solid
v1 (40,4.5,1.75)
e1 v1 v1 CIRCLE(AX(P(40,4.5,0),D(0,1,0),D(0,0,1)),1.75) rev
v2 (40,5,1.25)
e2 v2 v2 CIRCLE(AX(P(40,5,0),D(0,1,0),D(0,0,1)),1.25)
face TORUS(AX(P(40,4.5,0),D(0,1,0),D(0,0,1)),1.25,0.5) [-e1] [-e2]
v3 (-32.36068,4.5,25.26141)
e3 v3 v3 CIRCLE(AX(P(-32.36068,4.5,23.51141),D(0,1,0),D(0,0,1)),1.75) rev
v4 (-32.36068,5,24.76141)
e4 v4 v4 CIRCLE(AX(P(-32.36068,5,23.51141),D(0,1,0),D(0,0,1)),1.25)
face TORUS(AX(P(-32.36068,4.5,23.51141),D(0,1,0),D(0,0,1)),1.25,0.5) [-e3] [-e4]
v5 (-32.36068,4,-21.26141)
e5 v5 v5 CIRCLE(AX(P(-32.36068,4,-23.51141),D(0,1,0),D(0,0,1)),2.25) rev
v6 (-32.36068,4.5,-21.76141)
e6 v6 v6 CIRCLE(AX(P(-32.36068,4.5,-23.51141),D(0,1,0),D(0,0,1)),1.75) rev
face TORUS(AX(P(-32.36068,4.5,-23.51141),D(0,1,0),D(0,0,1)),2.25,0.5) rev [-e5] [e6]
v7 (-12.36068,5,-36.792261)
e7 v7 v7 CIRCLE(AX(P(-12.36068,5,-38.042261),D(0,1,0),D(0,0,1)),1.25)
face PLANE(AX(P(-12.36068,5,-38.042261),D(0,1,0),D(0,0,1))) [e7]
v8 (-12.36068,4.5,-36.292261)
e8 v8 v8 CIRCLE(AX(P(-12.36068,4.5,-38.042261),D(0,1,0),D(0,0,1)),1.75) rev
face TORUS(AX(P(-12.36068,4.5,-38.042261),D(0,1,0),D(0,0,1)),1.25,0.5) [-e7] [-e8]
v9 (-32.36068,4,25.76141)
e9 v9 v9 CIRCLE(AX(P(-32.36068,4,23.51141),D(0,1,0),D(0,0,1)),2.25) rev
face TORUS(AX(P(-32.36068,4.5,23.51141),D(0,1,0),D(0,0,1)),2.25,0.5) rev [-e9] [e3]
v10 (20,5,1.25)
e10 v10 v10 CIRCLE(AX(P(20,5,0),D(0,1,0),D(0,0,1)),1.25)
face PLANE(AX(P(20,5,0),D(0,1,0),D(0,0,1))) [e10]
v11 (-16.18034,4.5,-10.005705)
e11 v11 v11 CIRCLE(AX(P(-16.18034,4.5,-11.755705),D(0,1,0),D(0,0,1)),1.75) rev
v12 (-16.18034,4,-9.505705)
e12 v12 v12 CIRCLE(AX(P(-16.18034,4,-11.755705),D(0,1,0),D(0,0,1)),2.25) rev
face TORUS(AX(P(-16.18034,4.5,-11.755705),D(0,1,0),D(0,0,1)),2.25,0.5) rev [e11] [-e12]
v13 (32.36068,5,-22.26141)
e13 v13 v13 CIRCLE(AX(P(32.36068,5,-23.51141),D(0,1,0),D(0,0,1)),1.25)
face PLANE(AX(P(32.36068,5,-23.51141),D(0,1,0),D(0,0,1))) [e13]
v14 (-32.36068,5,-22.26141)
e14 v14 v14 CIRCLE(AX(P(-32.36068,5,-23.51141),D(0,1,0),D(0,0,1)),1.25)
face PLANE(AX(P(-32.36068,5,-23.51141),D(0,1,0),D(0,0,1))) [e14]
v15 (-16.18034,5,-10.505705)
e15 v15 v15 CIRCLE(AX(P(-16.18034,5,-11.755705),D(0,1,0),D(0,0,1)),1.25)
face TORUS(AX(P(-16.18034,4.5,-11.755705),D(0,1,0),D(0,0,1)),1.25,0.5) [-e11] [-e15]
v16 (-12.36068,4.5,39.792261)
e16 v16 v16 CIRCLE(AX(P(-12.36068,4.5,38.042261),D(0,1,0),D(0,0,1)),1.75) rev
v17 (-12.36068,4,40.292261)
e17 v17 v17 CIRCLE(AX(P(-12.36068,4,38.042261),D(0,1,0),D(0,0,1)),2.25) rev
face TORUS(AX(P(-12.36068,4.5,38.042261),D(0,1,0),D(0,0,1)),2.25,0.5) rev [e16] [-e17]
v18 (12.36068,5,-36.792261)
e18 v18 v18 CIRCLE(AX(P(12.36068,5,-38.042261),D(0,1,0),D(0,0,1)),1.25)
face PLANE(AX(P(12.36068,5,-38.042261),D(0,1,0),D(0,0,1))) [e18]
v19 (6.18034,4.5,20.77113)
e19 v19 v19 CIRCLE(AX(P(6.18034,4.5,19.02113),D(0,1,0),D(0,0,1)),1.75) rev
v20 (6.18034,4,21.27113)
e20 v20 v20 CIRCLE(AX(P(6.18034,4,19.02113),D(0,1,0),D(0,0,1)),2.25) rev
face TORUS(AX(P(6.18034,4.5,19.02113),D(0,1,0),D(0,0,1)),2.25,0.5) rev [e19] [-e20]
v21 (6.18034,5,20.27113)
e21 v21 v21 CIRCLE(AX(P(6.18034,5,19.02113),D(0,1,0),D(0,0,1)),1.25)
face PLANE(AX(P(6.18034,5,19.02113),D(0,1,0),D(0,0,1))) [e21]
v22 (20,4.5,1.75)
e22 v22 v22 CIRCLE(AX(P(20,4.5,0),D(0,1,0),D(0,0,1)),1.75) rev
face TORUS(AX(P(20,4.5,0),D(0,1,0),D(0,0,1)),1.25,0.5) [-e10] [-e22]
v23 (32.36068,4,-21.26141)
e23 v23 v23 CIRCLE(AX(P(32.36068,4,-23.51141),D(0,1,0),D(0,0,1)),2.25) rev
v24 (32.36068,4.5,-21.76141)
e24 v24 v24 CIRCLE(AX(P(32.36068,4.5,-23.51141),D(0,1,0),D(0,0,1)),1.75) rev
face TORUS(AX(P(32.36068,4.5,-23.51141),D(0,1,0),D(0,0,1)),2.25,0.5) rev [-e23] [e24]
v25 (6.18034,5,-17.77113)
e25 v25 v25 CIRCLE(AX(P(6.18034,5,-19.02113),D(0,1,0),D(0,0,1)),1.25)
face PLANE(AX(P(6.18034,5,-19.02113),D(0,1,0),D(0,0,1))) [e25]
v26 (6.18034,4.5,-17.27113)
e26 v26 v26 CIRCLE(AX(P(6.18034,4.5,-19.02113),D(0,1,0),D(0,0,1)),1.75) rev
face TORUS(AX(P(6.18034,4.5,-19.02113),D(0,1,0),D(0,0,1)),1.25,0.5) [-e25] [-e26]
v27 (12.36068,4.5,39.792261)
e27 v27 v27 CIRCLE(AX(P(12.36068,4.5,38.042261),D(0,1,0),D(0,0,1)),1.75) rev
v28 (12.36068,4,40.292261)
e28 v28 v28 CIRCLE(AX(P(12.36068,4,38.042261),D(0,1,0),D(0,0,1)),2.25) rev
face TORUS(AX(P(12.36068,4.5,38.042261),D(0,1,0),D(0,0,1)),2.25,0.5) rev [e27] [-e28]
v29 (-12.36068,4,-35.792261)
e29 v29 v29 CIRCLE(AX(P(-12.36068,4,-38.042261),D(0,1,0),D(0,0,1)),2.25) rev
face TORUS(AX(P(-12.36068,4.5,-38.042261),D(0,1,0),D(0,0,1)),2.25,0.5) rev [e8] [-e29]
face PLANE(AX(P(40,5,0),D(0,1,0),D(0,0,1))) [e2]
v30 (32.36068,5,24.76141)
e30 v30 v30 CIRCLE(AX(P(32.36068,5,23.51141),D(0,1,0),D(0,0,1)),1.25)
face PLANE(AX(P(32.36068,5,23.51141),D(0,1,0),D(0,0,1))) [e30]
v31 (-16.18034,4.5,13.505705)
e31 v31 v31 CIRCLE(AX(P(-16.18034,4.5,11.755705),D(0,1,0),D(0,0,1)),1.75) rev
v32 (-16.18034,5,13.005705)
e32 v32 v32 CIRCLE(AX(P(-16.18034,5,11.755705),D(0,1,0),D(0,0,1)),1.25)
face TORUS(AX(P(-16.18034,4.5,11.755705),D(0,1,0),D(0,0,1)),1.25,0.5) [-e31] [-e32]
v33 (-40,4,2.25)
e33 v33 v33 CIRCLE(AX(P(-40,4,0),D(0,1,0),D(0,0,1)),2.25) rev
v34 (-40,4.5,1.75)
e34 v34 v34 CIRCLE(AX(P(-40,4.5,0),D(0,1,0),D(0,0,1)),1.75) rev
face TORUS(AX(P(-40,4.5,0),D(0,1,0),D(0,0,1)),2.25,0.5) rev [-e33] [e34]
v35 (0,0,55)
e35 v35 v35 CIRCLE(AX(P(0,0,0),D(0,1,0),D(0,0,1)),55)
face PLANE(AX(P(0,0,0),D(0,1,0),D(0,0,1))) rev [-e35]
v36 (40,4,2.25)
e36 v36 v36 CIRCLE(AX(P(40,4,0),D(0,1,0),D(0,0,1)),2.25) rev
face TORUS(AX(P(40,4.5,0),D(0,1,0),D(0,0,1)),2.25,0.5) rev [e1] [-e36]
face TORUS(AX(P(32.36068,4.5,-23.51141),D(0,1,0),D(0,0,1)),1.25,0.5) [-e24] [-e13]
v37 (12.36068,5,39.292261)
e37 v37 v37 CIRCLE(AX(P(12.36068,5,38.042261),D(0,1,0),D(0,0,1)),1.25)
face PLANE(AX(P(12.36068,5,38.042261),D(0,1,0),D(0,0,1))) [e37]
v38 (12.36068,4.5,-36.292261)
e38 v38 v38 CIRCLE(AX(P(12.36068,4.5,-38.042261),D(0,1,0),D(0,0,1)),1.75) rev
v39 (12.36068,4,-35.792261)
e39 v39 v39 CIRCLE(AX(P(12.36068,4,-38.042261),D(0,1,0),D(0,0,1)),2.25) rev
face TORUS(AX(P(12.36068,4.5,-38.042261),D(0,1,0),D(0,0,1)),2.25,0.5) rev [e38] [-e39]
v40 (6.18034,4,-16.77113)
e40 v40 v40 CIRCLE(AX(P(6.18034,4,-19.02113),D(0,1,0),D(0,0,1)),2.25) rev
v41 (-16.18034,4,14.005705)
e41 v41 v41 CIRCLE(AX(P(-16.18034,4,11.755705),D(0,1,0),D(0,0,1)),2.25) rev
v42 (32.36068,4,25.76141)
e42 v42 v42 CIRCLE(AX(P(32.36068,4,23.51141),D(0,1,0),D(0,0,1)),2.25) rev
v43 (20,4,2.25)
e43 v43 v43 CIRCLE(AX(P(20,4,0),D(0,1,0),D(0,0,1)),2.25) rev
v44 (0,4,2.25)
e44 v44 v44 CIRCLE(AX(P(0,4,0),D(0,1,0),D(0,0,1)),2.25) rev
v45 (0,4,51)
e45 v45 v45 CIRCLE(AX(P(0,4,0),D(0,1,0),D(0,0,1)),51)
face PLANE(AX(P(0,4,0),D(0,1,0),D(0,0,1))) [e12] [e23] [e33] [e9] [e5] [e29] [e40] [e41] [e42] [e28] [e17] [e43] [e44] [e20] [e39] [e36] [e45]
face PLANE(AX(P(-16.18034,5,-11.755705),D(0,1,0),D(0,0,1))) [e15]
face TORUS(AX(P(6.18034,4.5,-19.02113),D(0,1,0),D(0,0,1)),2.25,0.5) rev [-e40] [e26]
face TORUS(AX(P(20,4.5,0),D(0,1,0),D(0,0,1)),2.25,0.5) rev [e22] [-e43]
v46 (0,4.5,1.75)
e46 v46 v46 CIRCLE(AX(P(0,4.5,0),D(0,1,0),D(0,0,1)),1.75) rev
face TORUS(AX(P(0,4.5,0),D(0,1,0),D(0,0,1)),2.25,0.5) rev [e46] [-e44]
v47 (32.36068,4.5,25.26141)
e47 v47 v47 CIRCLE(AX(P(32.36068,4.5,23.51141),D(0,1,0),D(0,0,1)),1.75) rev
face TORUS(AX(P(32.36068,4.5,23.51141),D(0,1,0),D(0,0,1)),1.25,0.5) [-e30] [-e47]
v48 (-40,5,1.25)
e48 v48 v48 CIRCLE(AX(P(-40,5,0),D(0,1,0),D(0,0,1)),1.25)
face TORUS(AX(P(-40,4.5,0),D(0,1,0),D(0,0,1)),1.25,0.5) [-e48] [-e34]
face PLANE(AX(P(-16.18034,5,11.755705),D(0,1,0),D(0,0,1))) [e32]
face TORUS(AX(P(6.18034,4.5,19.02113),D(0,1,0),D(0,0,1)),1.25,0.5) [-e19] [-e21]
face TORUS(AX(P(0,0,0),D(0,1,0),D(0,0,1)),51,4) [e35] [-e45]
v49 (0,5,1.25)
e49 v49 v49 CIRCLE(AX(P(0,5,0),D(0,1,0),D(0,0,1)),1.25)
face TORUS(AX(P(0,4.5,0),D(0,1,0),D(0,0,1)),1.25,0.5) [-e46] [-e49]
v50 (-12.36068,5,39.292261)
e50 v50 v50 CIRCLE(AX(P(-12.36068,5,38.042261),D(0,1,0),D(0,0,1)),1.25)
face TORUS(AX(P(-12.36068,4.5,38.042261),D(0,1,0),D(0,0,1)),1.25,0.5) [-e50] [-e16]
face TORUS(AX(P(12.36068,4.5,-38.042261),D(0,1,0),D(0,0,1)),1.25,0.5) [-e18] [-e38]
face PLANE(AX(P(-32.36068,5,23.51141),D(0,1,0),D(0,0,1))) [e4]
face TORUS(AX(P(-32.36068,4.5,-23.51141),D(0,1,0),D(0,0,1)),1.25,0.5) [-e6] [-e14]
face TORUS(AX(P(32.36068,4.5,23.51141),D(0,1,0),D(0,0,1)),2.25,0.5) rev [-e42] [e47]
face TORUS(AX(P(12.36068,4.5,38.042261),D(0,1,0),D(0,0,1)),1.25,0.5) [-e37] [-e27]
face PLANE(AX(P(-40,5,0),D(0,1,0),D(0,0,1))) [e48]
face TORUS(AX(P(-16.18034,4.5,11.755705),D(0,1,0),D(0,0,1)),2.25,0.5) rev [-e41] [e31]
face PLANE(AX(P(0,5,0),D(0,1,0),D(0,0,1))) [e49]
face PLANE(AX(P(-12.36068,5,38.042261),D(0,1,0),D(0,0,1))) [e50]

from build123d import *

# Parameters (mm, degrees)
SKETCH1_R           = 55
BOSS_EXTRUDE1_DEPTH = 4
FILLET4_R           = 4
SKETCH5_R           = 1.75
BOSS_EXTRUDE3_DEPTH = 1
FILLET6_R           = 0.5


with BuildPart() as part:
    # Sketch1 → Boss-Extrude1 (new body)
    with BuildSketch(Plane(origin=(0, 0, 0), x_dir=(1, 0, 0), z_dir=(0, 1, 0))):
        with Locations(Location((0, 0, 0), (0, 0, 270))):
            Circle(SKETCH1_R)
    extrude(amount=BOSS_EXTRUDE1_DEPTH)

    # Fillet4
    fillet4_edges = [part.edges().sort_by_distance(p)[0] for p in [
        (0, 4, -55),
    ]]
    fillet(fillet4_edges, radius=FILLET4_R - 0.0001)  # a hair under: the kernel refuses the full size

    # Sketch5 → Boss-Extrude3 (add)
    with BuildSketch(Plane(origin=(0, 4, 0), x_dir=(1, 0, 0), z_dir=(0, 1, 0))):
        with Locations(Location((0, 0, 0), (0, 0, 270))):
            Circle(SKETCH5_R)
        with Locations(Location((20, 0, 0), (0, 0, 270))):
            Circle(SKETCH5_R)
        with Locations(Location((40, 0, 0), (0, 0, 270))):
            Circle(SKETCH5_R)
        with Locations(Location((6.180339887, -19.021130326, 0), (0, 0, 270))):
            Circle(SKETCH5_R)
        with Locations(Location((-16.180339887, -11.755705046, 0), (0, 0, 270))):
            Circle(SKETCH5_R)
        with Locations(Location((-16.180339887, 11.755705046, 0), (0, 0, 270))):
            Circle(SKETCH5_R)
        with Locations(Location((6.180339887, 19.021130326, 0), (0, 0, 270))):
            Circle(SKETCH5_R)
        with Locations(Location((32.360679775, -23.511410092, 0), (0, 0, 270))):
            Circle(SKETCH5_R)
        with Locations(Location((12.360679775, -38.042260652, 0), (0, 0, 270))):
            Circle(SKETCH5_R)
        with Locations(Location((-12.360679775, -38.042260652, 0), (0, 0, 270))):
            Circle(SKETCH5_R)
        with Locations(Location((-32.360679775, -23.511410092, 0), (0, 0, 270))):
            Circle(SKETCH5_R)
        with Locations(Location((-40, 0, 0), (0, 0, 270))):
            Circle(SKETCH5_R)
        with Locations(Location((-32.360679775, 23.511410092, 0), (0, 0, 270))):
            Circle(SKETCH5_R)
        with Locations(Location((-12.360679775, 38.042260652, 0), (0, 0, 270))):
            Circle(SKETCH5_R)
        with Locations(Location((12.360679775, 38.042260652, 0), (0, 0, 270))):
            Circle(SKETCH5_R)
        with Locations(Location((32.360679775, 23.511410092, 0), (0, 0, 270))):
            Circle(SKETCH5_R)
    extrude(amount=BOSS_EXTRUDE3_DEPTH)

    # Fillet6
    fillet6_edges = [part.edges().sort_by_distance(p)[0] for p in [
        (20, 4, -1.75),
        (20, 5, -1.75),
        (40, 4, -1.75),
        (40, 5, -1.75),
        (6.180339887, 4, 17.271130326),
        (6.180339887, 5, 17.271130326),
        (-16.180339887, 4, 10.005705046),
        (-16.180339887, 5, 10.005705046),
        (-16.180339887, 4, -13.505705046),
        (-16.180339887, 5, -13.505705046),
        (6.180339887, 4, -20.771130326),
        (6.180339887, 5, -20.771130326),
        (32.360679775, 4, 21.761410092),
        (32.360679775, 5, 21.761410092),
        (12.360679775, 4, 36.292260652),
        (12.360679775, 5, 36.292260652),
        (-12.360679775, 4, 36.292260652),
        (-12.360679775, 5, 36.292260652),
        (-32.360679775, 4, 21.761410092),
        (-32.360679775, 5, 21.761410092),
        (-40, 4, -1.75),
        (-40, 5, -1.75),
        (-32.360679775, 4, -25.261410092),
        (-32.360679775, 5, -25.261410092),
        (-12.360679775, 4, -39.792260652),
        (-12.360679775, 5, -39.792260652),
        (12.360679775, 4, -39.792260652),
        (12.360679775, 5, -39.792260652),
        (32.360679775, 4, -25.261410092),
        (32.360679775, 5, -25.261410092),
        (0, 4, -1.75),
        (0, 5, -1.75),
    ]]
    fillet(fillet6_edges, radius=FILLET6_R - 0.0001)  # a hair under: the kernel refuses the full size


solid = part.part
